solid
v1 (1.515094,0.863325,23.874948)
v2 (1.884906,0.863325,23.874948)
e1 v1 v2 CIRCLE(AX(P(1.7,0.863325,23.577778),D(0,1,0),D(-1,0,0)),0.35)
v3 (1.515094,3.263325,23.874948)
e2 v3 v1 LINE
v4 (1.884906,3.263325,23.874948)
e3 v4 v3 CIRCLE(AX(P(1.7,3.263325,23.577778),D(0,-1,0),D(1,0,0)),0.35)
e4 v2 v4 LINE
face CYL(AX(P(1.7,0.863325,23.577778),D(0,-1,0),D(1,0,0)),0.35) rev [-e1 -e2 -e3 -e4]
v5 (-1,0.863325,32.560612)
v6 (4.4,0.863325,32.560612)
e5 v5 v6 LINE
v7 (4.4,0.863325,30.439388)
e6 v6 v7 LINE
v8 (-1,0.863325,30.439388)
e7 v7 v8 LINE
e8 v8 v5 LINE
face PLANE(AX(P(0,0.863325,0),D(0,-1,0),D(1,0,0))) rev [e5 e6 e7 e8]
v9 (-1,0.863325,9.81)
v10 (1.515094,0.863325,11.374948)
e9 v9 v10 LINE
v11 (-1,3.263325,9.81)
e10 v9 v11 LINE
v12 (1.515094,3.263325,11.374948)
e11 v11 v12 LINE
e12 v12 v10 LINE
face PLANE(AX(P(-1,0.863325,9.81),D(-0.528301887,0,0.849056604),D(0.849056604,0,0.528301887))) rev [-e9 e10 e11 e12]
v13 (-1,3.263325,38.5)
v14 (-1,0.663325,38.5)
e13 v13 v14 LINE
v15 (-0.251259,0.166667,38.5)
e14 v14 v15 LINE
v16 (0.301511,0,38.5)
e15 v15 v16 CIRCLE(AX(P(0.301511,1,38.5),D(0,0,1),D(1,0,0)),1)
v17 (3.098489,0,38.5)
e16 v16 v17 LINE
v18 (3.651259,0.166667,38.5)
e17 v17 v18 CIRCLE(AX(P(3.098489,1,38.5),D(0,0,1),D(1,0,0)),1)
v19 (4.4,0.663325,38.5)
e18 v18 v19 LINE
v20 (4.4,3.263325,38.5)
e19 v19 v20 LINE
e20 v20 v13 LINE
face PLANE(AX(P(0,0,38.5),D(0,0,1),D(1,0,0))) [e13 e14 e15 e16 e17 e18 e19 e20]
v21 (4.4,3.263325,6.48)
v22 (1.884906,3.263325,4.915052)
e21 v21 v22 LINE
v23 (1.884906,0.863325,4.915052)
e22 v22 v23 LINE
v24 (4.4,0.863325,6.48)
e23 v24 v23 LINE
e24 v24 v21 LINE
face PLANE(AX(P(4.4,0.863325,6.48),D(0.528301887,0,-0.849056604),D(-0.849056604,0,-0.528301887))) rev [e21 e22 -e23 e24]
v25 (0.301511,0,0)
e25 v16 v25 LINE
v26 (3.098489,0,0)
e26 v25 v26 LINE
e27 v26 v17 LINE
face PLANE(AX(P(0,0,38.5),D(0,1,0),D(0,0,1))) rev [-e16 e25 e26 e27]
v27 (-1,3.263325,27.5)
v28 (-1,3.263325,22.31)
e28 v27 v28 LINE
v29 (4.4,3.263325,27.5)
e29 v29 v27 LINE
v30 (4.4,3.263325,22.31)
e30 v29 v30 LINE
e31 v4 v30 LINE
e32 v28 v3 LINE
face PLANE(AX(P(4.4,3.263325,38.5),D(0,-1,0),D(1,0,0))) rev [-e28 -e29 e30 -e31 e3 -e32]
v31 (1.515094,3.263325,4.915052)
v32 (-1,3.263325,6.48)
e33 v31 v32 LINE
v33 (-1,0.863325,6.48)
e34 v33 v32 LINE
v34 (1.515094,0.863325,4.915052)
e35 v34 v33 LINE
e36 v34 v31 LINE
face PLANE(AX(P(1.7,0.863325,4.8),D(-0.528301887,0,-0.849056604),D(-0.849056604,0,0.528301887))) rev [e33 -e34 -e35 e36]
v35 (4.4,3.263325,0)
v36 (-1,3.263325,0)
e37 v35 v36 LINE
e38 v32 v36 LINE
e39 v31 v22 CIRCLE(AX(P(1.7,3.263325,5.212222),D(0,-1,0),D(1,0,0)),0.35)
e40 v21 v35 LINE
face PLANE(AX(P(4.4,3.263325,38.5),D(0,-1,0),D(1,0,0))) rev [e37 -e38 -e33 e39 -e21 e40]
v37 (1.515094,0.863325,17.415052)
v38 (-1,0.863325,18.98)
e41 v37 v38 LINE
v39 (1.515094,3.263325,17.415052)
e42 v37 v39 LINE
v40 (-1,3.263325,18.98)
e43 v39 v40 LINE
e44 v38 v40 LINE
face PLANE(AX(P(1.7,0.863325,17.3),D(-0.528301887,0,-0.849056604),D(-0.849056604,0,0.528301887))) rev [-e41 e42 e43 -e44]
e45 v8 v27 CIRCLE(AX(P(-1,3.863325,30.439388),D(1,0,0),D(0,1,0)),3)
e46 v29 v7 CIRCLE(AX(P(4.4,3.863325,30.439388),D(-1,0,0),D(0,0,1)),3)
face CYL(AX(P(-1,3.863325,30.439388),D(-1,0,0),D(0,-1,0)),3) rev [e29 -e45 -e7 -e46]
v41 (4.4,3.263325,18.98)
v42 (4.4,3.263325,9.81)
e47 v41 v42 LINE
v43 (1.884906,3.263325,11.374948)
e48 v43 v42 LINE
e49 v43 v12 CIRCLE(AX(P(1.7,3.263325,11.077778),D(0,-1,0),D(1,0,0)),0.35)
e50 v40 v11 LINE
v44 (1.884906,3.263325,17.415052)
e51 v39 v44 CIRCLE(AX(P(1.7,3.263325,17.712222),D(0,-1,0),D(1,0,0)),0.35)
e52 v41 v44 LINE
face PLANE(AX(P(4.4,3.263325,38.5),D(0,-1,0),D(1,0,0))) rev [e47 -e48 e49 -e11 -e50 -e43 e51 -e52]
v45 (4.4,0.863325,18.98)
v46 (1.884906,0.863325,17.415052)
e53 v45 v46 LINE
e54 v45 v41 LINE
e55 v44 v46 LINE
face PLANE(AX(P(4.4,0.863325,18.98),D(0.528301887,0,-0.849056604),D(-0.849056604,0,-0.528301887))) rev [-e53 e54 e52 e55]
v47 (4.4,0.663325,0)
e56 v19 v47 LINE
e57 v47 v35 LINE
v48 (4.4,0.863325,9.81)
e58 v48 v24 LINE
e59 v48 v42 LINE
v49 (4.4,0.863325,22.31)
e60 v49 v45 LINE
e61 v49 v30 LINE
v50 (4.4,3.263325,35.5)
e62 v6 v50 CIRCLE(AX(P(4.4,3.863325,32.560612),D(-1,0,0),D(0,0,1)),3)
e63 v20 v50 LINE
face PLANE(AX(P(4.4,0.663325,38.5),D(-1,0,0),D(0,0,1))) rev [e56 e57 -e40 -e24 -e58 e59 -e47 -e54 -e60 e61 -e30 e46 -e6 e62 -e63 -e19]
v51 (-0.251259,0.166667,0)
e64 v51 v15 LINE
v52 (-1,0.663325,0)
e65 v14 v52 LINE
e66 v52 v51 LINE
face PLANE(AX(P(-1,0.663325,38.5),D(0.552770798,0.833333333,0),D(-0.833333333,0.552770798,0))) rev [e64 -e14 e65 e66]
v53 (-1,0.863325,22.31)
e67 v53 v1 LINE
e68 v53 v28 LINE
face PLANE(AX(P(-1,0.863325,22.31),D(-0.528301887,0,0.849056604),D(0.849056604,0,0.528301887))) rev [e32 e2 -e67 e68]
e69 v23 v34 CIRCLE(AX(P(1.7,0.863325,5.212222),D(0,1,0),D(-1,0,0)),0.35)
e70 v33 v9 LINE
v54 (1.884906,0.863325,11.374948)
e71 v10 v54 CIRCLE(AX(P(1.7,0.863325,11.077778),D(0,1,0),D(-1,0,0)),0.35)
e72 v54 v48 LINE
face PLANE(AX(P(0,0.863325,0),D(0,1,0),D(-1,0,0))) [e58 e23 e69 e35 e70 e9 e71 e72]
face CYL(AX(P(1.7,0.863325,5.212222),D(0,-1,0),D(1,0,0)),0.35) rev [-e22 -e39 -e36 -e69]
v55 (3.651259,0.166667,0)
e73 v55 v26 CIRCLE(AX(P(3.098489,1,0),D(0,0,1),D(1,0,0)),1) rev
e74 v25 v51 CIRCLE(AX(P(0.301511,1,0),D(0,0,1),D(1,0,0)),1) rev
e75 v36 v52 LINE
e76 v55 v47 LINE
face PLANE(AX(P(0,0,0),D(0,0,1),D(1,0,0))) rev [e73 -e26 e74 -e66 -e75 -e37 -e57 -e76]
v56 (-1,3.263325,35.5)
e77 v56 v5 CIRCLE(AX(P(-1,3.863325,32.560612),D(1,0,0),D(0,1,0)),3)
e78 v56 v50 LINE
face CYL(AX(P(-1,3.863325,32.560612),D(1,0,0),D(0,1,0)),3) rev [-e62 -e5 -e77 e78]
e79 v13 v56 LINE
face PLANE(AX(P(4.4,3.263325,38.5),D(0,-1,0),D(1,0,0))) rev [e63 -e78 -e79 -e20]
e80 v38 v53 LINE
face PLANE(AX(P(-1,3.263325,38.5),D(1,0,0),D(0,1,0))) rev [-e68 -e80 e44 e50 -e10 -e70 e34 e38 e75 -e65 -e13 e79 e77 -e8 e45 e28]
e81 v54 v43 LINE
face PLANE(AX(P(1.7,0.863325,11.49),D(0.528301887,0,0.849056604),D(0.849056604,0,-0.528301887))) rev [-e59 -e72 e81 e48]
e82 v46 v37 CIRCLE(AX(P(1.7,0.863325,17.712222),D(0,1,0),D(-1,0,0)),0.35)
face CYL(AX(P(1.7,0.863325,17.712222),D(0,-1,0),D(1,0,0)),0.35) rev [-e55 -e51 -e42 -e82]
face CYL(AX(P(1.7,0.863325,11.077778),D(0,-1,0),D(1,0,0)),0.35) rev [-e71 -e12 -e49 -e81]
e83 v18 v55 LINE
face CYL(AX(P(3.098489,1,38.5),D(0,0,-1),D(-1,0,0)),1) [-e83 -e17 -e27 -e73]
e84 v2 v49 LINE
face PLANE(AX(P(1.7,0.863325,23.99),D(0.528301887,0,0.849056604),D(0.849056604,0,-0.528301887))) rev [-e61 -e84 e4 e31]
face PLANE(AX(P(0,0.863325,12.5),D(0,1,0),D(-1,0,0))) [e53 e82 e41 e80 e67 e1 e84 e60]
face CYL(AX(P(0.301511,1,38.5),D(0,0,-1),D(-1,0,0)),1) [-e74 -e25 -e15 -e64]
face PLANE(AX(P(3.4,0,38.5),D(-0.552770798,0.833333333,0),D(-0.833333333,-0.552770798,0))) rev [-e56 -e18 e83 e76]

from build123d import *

# Parameters (mm, degrees)
BOSS_EXTRUDE1_DEPTH = 38.5
FILLET3_R           = 1
FILLET4_R           = 1
CUT_EXTRUDE1_DEPTH  = 2.4
LPATTERN1_COUNT     = 2
LPATTERN1_PITCH     = 12.5
SKETCH3_W           = 5.4
SKETCH3_H           = 8
CUT_EXTRUDE2_DEPTH  = 2.4
FILLET5_R           = 3
FILLET6_R           = 0.35


with BuildPart() as part:
    # Sketch1 → Boss-Extrude1 (new body)
    with BuildSketch(Plane.XY):
        Polygon((0, 0), (3.4, 0), (4.4, 0.663324958), (4.4, 3.263324958), (-1, 3.263324958), (-1, 0.663324958), align=None)
    extrude(amount=BOSS_EXTRUDE1_DEPTH)

    # Fillet3
    fillet3_edges = [part.edges().sort_by_distance(p)[0] for p in [
        (3.4, 0, 19.25),
    ]]
    fillet(fillet3_edges, radius=FILLET3_R)

    # Fillet4
    fillet4_edges = [part.edges().sort_by_distance(p)[0] for p in [
        (0, 0, 19.25),
    ]]
    fillet(fillet4_edges, radius=FILLET4_R)

    # Sketch2 → Cut-Extrude1 (cut)
    with BuildSketch(Plane(origin=(0, 3.263324958, 0), x_dir=(1, 0, 0), z_dir=(0, 1, 0))):
        Polygon((4.4, -9.81), (4.4, -6.48), (1.7, -4.8), (-1, -6.48), (-1, -9.81), (1.7, -11.49), align=None)
    cut_extrude1 = extrude(amount=-CUT_EXTRUDE1_DEPTH, mode=Mode.SUBTRACT)

    # LPattern1: Cut-Extrude1 ×2
    with Locations(*[(0, 0, i * LPATTERN1_PITCH) for i in range(1, LPATTERN1_COUNT)]):
        add(cut_extrude1, mode=Mode.SUBTRACT)

    # Sketch3 → Cut-Extrude2 (cut)
    with BuildSketch(Plane(origin=(0, 3.263324958, 0), x_dir=(1, 0, 0), z_dir=(0, 1, 0))):
        with Locations((1.7, -31.5)):
            Rectangle(SKETCH3_W, SKETCH3_H)
    extrude(amount=-CUT_EXTRUDE2_DEPTH, mode=Mode.SUBTRACT)

    # Fillet5
    # the kernel refuses this fillet: 3 mm, written as the material it adds along each edge
    with BuildSketch(Plane(origin=(4.4, 0.863324958, 27.5), x_dir=(0, 0, 1), z_dir=(-1, 0, 0))) as fillet5_piece_1:
        with BuildLine():
            CenterArc((2.939387691, 3), FILLET5_R, 191.536959033, 78.463040967)
            Line((0, 2.4), (-0.058787754, 2.388))
            ThreePointArc((-0.058787754, 2.388), (-0.06, 1.2), (-0.06, 0))
            Line((-0.06, 0), (0, -0.06))
            Line((0, -0.06), (2.939387691, -0.06))
            Line((2.939387691, -0.06), (2.939387691, 0))
        make_face()
    extrude(amount=5.4)
    with BuildSketch(Plane(origin=(-1, 0.863324958, 35.5), x_dir=(0, 1.0, -1.5483910450100627e-12), z_dir=(1, 0, 0))) as fillet5_piece_2:
        with BuildLine():
            CenterArc((3, -2.939387691), FILLET5_R, 101.536959033, 78.463040967)
            Line((0, -2.939387691), (-0.06, -2.939387691))
            Line((-0.06, -2.939387691), (-0.06, 0))
            Line((-0.06, 0), (0, 0.06))
            ThreePointArc((0, 0.06), (1.2, 0.06), (2.388, 0.058787754))
            Line((2.388, 0.058787754), (2.4, 0))
        make_face()
    extrude(amount=5.4)

    # Fillet6
    fillet6_edges = [part.edges().sort_by_distance(p)[0] for p in [
        (1.7, 2.063324958, 11.49),
        (1.7, 2.063324958, 4.8),
        (1.7, 2.063324958, 23.99),
        (1.7, 2.063324958, 17.3),
    ]]
    fillet(fillet6_edges, radius=FILLET6_R)


solid = part.part
